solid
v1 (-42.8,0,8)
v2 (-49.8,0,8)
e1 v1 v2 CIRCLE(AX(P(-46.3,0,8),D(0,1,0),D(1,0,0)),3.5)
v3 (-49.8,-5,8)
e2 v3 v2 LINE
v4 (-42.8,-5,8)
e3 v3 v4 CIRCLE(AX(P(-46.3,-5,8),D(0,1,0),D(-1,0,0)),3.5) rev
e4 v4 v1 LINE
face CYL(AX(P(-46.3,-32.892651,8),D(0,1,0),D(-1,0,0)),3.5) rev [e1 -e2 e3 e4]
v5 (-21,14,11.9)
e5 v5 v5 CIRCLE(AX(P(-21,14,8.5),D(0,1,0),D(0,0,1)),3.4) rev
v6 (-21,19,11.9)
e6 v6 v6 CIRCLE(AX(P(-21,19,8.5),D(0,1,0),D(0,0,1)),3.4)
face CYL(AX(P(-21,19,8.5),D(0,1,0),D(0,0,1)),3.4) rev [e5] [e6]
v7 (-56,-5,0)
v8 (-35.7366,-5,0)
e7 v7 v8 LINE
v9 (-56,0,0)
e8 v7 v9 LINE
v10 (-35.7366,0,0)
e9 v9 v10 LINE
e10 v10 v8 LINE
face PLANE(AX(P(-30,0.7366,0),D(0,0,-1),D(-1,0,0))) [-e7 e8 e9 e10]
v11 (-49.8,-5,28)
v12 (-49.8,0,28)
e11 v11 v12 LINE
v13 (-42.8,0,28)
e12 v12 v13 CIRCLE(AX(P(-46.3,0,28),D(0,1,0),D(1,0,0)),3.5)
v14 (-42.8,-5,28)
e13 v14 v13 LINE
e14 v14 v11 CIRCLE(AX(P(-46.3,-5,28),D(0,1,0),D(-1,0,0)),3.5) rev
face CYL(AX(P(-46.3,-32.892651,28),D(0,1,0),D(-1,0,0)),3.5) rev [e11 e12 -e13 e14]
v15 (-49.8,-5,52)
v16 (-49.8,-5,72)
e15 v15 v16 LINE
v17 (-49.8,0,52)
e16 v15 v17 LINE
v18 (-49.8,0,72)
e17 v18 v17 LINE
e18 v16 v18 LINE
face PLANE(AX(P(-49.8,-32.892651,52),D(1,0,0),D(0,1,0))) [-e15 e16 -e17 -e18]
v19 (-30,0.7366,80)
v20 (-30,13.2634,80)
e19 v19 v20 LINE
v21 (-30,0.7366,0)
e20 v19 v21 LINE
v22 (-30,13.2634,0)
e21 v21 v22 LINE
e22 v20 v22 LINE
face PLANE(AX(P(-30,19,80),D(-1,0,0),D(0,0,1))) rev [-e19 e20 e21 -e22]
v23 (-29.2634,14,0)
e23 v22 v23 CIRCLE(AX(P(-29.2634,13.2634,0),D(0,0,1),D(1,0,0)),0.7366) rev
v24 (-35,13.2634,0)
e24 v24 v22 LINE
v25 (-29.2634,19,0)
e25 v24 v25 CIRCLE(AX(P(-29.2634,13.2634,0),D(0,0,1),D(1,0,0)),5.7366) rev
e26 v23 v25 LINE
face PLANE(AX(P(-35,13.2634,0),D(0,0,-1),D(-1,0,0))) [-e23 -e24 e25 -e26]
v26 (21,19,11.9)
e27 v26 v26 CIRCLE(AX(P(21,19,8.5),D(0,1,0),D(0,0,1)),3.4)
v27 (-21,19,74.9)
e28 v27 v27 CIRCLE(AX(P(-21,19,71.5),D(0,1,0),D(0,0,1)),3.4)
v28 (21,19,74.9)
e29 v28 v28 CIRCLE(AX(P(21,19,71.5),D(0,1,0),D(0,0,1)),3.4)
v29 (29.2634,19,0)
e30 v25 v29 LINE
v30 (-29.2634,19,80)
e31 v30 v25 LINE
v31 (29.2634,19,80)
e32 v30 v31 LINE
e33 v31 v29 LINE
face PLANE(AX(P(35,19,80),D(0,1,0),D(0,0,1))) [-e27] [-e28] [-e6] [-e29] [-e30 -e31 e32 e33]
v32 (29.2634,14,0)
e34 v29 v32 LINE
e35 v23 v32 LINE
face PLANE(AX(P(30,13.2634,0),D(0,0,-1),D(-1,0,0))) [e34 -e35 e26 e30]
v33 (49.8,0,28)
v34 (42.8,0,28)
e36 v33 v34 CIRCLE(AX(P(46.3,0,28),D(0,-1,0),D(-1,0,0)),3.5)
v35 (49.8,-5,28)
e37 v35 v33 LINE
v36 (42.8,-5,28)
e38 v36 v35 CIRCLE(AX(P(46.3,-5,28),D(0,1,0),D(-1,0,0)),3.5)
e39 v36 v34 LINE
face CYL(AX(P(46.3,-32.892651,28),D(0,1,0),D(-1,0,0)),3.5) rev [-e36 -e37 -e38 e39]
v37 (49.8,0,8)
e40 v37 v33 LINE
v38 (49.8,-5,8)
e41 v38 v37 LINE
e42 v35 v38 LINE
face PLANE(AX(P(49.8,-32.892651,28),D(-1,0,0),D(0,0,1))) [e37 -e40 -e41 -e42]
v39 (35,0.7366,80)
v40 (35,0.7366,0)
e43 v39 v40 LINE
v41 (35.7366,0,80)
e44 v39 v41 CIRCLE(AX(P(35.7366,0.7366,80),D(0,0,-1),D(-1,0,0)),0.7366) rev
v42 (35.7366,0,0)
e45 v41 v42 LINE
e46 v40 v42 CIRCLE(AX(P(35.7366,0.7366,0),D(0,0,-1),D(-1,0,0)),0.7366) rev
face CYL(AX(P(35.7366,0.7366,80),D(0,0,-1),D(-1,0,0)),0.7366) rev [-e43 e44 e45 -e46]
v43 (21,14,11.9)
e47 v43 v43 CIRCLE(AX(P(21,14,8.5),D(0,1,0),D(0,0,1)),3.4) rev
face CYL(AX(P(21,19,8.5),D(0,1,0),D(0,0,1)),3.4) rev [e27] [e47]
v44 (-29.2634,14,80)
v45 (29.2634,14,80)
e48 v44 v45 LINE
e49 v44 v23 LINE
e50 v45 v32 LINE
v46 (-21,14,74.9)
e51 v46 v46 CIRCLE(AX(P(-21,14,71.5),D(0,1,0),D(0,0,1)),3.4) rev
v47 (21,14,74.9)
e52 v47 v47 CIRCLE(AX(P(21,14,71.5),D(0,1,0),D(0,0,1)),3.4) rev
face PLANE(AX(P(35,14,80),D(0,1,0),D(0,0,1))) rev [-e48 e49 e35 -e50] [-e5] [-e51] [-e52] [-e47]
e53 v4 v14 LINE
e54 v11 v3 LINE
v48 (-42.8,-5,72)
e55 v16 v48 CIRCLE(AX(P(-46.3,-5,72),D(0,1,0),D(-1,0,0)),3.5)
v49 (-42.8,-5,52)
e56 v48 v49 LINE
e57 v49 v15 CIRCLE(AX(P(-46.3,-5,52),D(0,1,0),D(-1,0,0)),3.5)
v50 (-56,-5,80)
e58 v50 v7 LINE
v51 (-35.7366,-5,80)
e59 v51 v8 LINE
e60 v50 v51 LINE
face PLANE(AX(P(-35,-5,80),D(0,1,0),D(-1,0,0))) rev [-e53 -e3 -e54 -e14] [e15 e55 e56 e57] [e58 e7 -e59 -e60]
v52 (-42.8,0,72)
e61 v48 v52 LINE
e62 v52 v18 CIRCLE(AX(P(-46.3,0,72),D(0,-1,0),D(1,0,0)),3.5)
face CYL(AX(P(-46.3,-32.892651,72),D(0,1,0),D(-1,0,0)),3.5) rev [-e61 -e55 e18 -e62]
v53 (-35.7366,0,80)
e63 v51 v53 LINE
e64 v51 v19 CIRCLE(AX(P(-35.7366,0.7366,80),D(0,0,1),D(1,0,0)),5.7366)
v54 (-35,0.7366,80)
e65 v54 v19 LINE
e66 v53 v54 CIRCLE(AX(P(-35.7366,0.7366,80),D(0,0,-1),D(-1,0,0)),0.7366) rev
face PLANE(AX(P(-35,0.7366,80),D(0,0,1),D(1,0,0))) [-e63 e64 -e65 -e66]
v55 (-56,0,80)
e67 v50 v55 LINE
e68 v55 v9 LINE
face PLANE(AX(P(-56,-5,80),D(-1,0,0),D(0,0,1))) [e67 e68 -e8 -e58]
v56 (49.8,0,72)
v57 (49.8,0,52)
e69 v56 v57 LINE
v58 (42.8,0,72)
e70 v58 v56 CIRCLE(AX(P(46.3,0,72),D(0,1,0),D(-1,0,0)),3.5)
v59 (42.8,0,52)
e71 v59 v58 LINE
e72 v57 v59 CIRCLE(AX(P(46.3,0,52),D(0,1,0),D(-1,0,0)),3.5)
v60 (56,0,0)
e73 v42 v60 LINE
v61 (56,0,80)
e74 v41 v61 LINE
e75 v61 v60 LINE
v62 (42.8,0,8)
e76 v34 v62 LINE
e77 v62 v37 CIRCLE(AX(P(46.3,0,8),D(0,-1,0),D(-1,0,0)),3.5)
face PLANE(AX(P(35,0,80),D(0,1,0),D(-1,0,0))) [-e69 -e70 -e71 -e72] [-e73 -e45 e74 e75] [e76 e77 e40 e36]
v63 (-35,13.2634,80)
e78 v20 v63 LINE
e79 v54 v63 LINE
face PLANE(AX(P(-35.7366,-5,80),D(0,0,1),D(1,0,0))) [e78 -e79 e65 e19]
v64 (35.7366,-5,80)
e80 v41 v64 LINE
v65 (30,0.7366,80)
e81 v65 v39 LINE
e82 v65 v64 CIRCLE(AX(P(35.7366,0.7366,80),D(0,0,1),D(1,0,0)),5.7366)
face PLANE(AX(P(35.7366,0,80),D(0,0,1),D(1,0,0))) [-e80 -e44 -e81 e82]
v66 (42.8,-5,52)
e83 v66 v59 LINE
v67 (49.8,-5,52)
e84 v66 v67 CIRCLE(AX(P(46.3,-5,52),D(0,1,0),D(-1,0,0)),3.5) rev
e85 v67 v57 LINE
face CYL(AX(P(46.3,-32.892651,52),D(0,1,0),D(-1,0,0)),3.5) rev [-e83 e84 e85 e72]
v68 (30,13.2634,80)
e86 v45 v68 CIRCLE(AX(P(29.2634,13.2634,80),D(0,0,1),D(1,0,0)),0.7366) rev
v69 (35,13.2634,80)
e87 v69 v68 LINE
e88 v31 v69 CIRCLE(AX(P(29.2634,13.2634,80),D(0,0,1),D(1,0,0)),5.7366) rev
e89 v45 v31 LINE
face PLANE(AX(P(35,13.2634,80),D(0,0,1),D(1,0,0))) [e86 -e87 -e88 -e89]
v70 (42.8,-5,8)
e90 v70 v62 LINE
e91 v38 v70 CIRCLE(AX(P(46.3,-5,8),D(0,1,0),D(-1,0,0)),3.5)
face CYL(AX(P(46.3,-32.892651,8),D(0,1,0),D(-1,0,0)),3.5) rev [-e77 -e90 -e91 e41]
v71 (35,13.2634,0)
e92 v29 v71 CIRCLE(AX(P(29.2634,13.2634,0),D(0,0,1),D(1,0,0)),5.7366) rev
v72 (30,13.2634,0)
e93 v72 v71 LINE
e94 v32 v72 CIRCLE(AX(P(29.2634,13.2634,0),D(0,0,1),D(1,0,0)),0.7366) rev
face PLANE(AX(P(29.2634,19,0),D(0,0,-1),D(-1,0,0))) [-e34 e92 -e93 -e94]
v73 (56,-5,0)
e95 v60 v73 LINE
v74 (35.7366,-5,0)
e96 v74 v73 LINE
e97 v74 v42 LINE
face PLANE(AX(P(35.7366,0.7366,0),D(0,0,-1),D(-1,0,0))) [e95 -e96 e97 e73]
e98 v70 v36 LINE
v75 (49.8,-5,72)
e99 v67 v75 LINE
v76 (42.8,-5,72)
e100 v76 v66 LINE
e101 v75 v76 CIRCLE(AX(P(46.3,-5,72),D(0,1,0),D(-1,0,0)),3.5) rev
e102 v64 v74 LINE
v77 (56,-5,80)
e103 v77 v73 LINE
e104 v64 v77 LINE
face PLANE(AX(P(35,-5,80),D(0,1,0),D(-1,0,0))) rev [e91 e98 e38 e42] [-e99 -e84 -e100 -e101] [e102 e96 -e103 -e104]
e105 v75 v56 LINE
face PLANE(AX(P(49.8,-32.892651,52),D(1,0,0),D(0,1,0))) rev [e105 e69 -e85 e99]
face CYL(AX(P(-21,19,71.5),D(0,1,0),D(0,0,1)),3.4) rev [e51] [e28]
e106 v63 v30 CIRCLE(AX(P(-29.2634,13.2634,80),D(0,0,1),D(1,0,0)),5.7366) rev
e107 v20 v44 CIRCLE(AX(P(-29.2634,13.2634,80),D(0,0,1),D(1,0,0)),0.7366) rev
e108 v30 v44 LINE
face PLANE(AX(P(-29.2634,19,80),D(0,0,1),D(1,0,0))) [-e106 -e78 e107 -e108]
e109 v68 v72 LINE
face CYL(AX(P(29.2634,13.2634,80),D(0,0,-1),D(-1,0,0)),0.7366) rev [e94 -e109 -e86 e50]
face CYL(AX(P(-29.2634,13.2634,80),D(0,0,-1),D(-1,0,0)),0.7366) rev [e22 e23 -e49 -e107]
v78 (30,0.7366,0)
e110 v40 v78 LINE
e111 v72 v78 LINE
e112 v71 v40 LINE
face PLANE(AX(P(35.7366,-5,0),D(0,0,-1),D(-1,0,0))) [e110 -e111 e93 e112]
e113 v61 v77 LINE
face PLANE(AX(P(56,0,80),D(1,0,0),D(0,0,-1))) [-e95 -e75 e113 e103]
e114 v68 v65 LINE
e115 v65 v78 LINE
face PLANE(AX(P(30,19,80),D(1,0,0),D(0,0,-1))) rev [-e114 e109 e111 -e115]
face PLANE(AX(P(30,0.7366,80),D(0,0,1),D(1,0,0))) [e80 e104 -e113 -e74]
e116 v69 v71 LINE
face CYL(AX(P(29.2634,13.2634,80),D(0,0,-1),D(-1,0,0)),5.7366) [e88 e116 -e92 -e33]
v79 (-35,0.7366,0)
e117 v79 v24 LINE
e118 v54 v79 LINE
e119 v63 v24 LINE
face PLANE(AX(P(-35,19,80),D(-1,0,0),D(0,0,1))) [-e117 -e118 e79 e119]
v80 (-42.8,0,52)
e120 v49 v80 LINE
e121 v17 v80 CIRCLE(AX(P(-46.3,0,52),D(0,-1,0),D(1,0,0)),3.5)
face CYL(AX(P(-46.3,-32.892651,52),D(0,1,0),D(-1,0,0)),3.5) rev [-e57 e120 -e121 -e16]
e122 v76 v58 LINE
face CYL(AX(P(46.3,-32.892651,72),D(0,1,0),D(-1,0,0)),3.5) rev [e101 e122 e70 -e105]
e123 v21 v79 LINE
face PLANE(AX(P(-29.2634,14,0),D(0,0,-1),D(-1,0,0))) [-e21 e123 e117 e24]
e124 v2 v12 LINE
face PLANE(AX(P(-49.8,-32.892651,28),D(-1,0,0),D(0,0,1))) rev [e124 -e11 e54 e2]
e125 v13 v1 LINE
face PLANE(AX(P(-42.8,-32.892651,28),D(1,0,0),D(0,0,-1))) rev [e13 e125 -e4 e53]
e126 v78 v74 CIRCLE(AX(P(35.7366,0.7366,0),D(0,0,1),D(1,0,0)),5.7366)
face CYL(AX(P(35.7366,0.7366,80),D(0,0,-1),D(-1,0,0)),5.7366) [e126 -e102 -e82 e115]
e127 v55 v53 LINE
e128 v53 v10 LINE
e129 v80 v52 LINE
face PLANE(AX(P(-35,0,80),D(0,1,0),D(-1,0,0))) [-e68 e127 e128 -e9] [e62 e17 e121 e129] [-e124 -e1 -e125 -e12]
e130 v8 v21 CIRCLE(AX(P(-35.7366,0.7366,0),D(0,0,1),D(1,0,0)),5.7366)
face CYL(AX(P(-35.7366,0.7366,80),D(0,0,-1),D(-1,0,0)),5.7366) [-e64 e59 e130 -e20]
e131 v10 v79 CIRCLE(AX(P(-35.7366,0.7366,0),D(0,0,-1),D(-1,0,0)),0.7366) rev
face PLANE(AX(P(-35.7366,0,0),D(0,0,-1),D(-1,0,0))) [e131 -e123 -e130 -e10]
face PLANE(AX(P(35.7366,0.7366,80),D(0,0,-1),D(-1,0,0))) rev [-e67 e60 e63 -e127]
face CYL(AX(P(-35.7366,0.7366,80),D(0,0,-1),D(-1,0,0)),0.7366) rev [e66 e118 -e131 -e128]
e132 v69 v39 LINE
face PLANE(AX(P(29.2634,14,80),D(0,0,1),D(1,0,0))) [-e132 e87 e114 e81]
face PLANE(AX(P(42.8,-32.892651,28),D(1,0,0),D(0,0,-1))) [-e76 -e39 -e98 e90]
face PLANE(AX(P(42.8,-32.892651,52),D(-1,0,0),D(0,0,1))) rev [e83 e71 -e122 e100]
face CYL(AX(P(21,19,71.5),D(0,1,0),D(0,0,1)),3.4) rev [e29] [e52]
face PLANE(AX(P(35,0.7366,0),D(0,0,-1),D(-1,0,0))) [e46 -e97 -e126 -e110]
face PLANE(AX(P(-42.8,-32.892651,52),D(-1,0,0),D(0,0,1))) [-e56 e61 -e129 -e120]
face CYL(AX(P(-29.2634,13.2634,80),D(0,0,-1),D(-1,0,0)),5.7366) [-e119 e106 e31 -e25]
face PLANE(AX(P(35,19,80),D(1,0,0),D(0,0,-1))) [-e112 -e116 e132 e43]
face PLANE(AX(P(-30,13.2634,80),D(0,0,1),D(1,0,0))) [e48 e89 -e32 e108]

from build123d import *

# Parameters (mm, degrees)
SM_BASE_FLANGE_1_DEPTH  = 80
HOLE_WIZARD_6_8_6_8_2_D = 6.8
CUT_EXTRUDE_3_DEPTH     = 5
MIRROR_5_COPY_1_D       = 6.8
MIRROR_5_COPY_2_DEPTH   = 5


# Sheet-metal steps are written as plain solids
with BuildPart() as part:
    # 草图3 → 基体-法兰1 (new body)
    with BuildSketch(Plane.XY):
        with BuildLine():
            Line((56, 0), (35.7366, 0))
            ThreePointArc((35.7366, 0), (35.215745145, 0.215745145), (35, 0.7366))
            Line((35, 0.7366), (35, 13.2634))
            ThreePointArc((35, 13.2634), (33.319788761, 17.319788761), (29.2634, 19))
            Line((29.2634, 19), (-29.2634, 19))
            ThreePointArc((-29.2634, 19), (-33.319788761, 17.319788761), (-35, 13.2634))
            Line((-35, 13.2634), (-35, 0.7366))
            ThreePointArc((-35, 0.7366), (-35.215745145, 0.215745145), (-35.7366, 0))
            Line((-35.7366, 0), (-56, 0))
            Line((-56, 0), (-56, -5))
            Line((-56, -5), (-35.7366, -5))
            ThreePointArc((-35.7366, -5), (-31.680211239, -3.319788761), (-30, 0.7366))
            Line((-30, 0.7366), (-30, 13.2634))
            ThreePointArc((-30, 13.2634), (-29.784254855, 13.784254855), (-29.2634, 14))
            Line((-29.2634, 14), (29.2634, 14))
            ThreePointArc((29.2634, 14), (29.784254855, 13.784254855), (30, 13.2634))
            Line((30, 13.2634), (30, 0.7366))
            ThreePointArc((30, 0.7366), (31.680211239, -3.319788761), (35.7366, -5))
            Line((35.7366, -5), (56, -5))
            Line((56, -5), (56, 0))
        make_face()
    extrude(amount=SM_BASE_FLANGE_1_DEPTH)

    # Ø6.8 (6.8) 直径孔2 (through all)
    with Locations(Plane(origin=(21, 19, 8.5), x_dir=(0, 0, 1), z_dir=(0, 1, 0))):
        with Locations((0, 0)):
            hole_wizard_6_8_6_8_2 = Hole(HOLE_WIZARD_6_8_6_8_2_D / 2)

    # 草图10 → 切除-拉伸3 (cut)
    with BuildSketch(Plane(origin=(0, 0, 0), x_dir=(1, 0, 0), z_dir=(0, 1, 0))):
        with BuildLine():
            Line((49.8, -52), (49.8, -72))
            ThreePointArc((49.8, -72), (46.3, -75.5), (42.8, -72))
            Line((42.8, -72), (42.8, -52))
            ThreePointArc((42.8, -52), (46.3, -48.5), (49.8, -52))
        make_face()
    cut_extrude_3 = extrude(amount=-CUT_EXTRUDE_3_DEPTH, mode=Mode.SUBTRACT)

    # 镜向4: Ø6.8 (6.8) 直径孔2, 切除-拉伸3 across plane
    add(hole_wizard_6_8_6_8_2.mirror(Plane(origin=(0, 0, 40), x_dir=(1, 0, 0), z_dir=(0, 0, -1))), mode=Mode.SUBTRACT)
    add(cut_extrude_3.mirror(Plane(origin=(0, 0, 40), x_dir=(1, 0, 0), z_dir=(0, 0, -1))), mode=Mode.SUBTRACT)

    # 镜向5: Ø6.8 (6.8) 直径孔2, 切除-拉伸3 across plane
    add(hole_wizard_6_8_6_8_2.mirror(Plane(origin=(0, 0, 0), x_dir=(0, 0, 1), z_dir=(1, 0, 0))), mode=Mode.SUBTRACT)
    add(cut_extrude_3.mirror(Plane(origin=(0, 0, 0), x_dir=(0, 0, 1), z_dir=(1, 0, 0))), mode=Mode.SUBTRACT)

    # 镜向5 copy 1 (through all)
    with Locations(Plane(origin=(-21, 19, 71.5), x_dir=(0, 0, -1), z_dir=(0, 1, 0))):
        with Locations((0, 0)):
            Hole(MIRROR_5_COPY_1_D / 2)

    # 镜向5 copy 2 sketch → 镜向5 copy 2 (cut)
    with BuildSketch(Plane(origin=(0, 0, 80), x_dir=(-1, 0, 0), z_dir=(0, 1, 0))):
        with BuildLine():
            Line((49.8, -52), (49.8, -72))
            ThreePointArc((49.8, -72), (46.3, -75.5), (42.8, -72))
            Line((42.8, -72), (42.8, -52))
            ThreePointArc((42.8, -52), (46.3, -48.5), (49.8, -52))
        make_face()
    extrude(amount=-MIRROR_5_COPY_2_DEPTH, mode=Mode.SUBTRACT)


solid = part.part
